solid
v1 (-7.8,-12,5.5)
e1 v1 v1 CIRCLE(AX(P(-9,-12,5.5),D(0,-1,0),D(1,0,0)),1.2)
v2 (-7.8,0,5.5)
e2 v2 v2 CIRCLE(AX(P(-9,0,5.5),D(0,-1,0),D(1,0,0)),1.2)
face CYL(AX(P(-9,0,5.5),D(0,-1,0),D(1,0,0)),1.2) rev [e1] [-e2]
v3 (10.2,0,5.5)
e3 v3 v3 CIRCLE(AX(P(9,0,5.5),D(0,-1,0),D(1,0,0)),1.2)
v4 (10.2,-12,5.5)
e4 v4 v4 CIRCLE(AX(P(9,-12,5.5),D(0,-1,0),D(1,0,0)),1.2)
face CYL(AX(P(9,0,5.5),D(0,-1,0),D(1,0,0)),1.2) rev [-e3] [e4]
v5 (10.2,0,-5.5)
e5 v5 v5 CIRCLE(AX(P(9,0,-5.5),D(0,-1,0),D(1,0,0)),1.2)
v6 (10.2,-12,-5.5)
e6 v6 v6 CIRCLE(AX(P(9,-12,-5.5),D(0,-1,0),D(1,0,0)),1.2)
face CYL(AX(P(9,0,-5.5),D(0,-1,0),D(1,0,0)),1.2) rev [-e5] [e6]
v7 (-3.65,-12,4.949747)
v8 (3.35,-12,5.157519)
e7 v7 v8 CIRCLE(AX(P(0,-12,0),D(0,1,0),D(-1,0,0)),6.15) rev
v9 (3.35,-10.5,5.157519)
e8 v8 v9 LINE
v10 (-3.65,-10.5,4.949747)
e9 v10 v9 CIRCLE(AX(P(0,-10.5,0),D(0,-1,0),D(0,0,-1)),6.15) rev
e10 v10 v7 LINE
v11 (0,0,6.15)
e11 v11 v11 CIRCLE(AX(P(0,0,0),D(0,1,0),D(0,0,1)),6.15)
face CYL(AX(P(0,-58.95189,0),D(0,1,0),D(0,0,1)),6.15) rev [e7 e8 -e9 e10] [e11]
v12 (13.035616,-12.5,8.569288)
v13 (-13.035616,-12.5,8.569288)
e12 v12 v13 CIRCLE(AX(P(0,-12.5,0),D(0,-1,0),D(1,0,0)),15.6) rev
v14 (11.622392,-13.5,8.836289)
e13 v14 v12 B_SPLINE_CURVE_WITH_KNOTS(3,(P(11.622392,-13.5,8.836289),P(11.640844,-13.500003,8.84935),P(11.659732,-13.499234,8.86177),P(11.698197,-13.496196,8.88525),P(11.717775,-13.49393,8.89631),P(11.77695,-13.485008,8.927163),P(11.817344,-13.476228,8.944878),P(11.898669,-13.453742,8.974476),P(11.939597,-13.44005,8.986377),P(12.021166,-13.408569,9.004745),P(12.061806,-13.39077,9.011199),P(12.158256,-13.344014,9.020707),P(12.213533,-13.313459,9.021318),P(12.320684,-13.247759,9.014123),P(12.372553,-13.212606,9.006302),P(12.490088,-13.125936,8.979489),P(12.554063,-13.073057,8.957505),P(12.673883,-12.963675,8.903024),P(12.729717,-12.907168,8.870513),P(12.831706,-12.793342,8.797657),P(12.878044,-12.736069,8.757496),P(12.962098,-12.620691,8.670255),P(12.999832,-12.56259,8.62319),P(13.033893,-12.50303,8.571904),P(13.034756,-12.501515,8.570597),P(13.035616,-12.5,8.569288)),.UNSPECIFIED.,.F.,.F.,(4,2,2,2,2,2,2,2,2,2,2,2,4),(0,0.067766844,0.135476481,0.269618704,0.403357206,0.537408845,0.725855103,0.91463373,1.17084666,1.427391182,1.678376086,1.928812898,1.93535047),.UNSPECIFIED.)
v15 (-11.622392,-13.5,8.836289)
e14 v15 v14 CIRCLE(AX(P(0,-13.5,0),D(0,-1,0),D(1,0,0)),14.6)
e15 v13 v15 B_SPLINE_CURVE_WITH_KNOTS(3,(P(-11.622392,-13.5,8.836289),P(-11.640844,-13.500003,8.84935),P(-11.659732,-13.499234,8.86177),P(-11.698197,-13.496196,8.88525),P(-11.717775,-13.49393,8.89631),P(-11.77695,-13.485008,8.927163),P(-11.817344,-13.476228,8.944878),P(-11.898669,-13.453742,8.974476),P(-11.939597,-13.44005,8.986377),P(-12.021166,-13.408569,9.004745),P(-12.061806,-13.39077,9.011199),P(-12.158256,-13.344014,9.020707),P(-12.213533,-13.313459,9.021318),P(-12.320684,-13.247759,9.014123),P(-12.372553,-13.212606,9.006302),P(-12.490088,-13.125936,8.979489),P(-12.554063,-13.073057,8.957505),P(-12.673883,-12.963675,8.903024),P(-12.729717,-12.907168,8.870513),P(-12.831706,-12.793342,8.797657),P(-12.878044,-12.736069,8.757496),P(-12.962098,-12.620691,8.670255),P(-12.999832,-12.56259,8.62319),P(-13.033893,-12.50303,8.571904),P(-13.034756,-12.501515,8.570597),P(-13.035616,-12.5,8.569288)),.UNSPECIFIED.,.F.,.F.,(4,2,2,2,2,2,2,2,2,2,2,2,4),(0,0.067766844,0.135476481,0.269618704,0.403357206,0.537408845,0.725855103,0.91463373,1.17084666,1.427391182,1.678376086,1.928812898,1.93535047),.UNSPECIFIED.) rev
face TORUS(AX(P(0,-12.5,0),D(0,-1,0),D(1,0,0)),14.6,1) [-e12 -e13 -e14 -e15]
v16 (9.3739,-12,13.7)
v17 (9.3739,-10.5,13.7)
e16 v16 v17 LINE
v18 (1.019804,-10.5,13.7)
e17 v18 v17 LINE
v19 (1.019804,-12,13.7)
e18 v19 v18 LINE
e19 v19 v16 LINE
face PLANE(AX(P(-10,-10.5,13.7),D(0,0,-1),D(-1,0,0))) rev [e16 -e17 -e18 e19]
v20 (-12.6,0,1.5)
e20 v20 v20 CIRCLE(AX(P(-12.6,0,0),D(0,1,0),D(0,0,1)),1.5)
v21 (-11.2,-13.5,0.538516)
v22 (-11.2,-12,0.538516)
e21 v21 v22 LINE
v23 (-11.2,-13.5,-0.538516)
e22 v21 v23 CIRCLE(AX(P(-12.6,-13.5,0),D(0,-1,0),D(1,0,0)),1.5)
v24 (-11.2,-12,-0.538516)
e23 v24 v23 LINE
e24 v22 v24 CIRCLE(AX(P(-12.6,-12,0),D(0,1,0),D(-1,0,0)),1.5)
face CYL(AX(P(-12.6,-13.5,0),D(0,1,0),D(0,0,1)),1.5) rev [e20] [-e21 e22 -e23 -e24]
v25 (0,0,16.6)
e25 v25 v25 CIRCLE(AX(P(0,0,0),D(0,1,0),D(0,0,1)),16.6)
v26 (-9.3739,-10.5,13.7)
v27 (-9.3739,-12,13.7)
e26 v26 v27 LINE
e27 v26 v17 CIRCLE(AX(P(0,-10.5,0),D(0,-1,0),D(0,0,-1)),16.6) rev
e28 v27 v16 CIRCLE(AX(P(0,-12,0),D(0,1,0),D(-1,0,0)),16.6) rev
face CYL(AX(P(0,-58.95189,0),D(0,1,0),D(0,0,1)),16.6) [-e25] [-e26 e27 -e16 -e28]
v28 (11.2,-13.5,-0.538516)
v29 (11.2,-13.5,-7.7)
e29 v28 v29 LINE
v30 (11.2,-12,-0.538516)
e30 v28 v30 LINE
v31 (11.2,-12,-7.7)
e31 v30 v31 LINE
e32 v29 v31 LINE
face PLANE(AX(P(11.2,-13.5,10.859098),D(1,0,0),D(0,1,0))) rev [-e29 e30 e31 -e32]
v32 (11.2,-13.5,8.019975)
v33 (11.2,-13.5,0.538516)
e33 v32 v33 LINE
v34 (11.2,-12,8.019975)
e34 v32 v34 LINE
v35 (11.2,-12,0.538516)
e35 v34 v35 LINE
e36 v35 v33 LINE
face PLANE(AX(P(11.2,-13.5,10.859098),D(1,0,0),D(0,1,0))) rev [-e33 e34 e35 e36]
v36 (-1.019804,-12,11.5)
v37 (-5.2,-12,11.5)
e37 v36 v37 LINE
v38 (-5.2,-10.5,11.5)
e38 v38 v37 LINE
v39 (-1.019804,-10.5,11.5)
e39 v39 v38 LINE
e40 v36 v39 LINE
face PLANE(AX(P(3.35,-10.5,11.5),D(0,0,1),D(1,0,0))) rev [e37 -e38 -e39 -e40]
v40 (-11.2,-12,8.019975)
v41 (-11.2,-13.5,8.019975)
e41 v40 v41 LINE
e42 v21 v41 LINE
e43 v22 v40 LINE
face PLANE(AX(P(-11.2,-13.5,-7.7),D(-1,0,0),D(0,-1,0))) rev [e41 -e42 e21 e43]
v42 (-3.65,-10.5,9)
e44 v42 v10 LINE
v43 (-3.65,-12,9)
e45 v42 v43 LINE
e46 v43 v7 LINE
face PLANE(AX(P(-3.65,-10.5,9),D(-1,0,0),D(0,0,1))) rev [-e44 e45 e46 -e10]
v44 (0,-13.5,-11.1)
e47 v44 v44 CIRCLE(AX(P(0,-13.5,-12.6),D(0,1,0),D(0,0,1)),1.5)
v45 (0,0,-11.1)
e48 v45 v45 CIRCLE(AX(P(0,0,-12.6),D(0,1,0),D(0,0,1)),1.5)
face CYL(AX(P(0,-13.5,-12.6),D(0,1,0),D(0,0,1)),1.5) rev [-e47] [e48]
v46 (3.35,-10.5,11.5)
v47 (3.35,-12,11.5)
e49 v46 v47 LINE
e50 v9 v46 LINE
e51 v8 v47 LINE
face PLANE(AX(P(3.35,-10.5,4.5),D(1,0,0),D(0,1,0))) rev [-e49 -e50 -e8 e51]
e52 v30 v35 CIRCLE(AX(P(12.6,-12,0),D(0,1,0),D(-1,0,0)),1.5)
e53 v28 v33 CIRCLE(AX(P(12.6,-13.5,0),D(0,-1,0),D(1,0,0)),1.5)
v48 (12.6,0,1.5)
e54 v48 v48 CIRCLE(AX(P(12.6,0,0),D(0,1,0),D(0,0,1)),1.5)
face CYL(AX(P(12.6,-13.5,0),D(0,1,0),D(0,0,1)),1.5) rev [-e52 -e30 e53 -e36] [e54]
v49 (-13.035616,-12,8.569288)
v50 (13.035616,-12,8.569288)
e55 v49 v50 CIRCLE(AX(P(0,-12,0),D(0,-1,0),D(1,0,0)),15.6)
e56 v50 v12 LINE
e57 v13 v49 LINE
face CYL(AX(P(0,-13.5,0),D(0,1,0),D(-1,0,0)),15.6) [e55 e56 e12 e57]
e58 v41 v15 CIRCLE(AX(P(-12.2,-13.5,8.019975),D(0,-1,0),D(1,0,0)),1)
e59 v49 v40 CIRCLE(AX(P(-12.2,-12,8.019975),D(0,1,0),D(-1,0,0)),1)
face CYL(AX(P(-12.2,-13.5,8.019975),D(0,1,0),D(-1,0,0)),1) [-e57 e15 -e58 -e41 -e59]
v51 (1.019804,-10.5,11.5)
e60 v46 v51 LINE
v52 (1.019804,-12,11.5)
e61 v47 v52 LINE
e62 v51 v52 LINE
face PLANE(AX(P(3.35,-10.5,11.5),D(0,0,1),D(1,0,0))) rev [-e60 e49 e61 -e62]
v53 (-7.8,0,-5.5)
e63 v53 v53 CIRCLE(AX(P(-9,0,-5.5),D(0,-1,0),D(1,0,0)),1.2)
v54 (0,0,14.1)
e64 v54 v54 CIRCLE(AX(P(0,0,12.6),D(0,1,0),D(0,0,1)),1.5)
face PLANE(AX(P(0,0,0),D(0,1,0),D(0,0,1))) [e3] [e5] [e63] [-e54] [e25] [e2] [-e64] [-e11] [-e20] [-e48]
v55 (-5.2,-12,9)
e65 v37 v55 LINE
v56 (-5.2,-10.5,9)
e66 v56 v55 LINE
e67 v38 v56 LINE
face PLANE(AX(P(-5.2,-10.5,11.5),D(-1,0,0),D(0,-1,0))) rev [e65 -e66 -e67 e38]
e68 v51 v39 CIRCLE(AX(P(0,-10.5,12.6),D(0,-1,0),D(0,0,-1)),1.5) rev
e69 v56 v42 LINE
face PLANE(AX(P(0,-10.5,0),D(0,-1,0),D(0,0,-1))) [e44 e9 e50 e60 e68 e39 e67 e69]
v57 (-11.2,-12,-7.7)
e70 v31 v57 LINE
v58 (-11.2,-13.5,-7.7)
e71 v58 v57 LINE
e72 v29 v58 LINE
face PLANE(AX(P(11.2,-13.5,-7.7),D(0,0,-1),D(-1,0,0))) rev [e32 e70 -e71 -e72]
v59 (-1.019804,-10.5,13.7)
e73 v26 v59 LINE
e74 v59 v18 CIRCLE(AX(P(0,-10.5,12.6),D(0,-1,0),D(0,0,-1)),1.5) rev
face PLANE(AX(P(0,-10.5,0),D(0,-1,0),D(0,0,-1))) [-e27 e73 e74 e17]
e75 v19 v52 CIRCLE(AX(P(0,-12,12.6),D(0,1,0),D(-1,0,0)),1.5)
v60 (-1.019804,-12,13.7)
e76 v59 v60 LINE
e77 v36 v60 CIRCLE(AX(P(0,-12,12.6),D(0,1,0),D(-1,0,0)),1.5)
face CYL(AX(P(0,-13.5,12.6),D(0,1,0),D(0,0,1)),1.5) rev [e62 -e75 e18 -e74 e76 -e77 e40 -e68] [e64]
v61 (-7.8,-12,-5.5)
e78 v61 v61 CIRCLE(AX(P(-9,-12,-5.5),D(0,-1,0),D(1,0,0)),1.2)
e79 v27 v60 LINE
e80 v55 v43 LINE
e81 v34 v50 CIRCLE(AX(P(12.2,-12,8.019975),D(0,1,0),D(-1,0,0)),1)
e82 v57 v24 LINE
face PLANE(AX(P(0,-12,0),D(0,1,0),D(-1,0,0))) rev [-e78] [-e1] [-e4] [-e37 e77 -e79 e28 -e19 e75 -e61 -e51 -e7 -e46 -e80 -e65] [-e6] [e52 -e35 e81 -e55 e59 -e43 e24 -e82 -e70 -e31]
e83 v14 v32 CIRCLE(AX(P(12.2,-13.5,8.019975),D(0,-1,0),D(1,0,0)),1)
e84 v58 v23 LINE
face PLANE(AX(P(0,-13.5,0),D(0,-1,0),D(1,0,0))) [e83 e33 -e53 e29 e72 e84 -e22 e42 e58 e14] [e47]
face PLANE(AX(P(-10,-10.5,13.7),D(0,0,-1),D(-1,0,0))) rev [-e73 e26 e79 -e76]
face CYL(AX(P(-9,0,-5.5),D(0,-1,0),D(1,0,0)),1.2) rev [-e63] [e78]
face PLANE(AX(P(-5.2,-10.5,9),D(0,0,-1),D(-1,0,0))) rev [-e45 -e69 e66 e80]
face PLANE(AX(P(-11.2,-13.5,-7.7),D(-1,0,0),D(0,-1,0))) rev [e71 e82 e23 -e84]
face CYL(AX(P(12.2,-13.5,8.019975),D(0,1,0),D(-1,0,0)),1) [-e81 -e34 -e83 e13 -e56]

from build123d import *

# Parameters (mm, degrees)
SKETCH4_R           = 16.6
SKETCH4_R_2         = 6.15
BOSS_EXTRUDE1_DEPTH = 12
BOSS_EXTRUDE2_DEPTH = 1.5
SKETCH6_R           = 1.2
CUT_EXTRUDE1_DEPTH  = 27.365128484
SKETCH7_R           = 1.5
CUT_EXTRUDE2_DEPTH  = 28.08080501
FILLET1_R           = 1
FILLET2_R           = 1
SKETCH8_W           = 20
SKETCH8_H           = 5
CUT_EXTRUDE3_DEPTH  = 1.5


with BuildPart() as part:
    # Sketch4 → Boss-Extrude1 (new body)
    with BuildSketch(Plane(origin=(0, 0, 0), x_dir=(1, 0, 0), z_dir=(0, 1, 0))):
        with Locations(Location((0, 0, 0), (0, 0, 270))):
            Circle(SKETCH4_R)
        with Locations(Location((0, 0, 0), (0, 0, 270))):
            Circle(SKETCH4_R_2, mode=Mode.SUBTRACT)
    extrude(amount=-BOSS_EXTRUDE1_DEPTH)

    # Sketch5 → Boss-Extrude2 (add)
    with BuildSketch(Plane.XZ.offset(12)):
        with BuildLine():
            Line((11.2, 10.859097568), (11.2, -7.7))
            Line((11.2, -7.7), (-11.2, -7.7))
            Line((-11.2, -7.7), (-11.2, 10.859097568))
            ThreePointArc((-11.2, 10.859097568), (0, -15.6), (11.2, 10.859097568))
        make_face()
    extrude(amount=BOSS_EXTRUDE2_DEPTH)

    # Sketch6 → Cut-Extrude1 (cut, through all)
    with BuildSketch(Plane.XZ.offset(12)):
        with Locations((9, -5.5)):
            Circle(SKETCH6_R)
        with Locations((9, 5.5)):
            Circle(SKETCH6_R)
        with Locations((-9, 5.5)):
            Circle(SKETCH6_R)
        with Locations((-9, -5.5)):
            Circle(SKETCH6_R)
    extrude(amount=-CUT_EXTRUDE1_DEPTH, mode=Mode.SUBTRACT)

    # Sketch7 → Cut-Extrude2 (cut, through all)
    with BuildSketch(Plane(origin=(0, 0, 0), x_dir=(1, 0, 0), z_dir=(0, 1, 0))):
        with Locations(Location((0, 12.6, 0), (0, 0, 270))):
            Circle(SKETCH7_R)
        with Locations(Location((12.6, 0, 0), (0, 0, 270))):
            Circle(SKETCH7_R)
        with Locations(Location((-12.6, 0, 0), (0, 0, 270))):
            Circle(SKETCH7_R)
        with Locations(Location((0, -12.6, 0), (0, 0, 270))):
            Circle(SKETCH7_R)
    extrude(amount=-CUT_EXTRUDE2_DEPTH, mode=Mode.SUBTRACT)

    # Fillet1
    fillet1_edges = [part.edges().sort_by_distance(p)[0] for p in [
        (-11.2, -12.75, 10.859097568),
        (11.2, -12.75, 10.859097568),
    ]]
    fillet(fillet1_edges, radius=FILLET1_R)

    # Fillet2
    # the kernel refuses this fillet: 1 mm, written as the material it takes off along each edge
    with BuildSketch(Plane(origin=(0, -13.5, 0), x_dir=(-0.7369271930502395, 0, 0.675972123791429), z_dir=(0.675972123791429, 0, 0.7369271930502395))) as fillet2_piece_1:
        with BuildLine():
            CenterArc((15.6 - FILLET2_R, -FILLET2_R), FILLET2_R, 0, 90)
            Line((15.6 - FILLET2_R, 0), (15.6, 0))
            Line((15.6, 0), (15.6, -FILLET2_R))
        make_face()
    revolve(axis=Axis((0, -13.5, 0), (0, -1, 0)), revolution_arc=265.059373538, mode=Mode.SUBTRACT)

    # Sketch8 → Cut-Extrude3 (cut)
    with BuildSketch(Plane.XZ.offset(12)):
        with Locations((0, 16.2)):
            Rectangle(SKETCH8_W, SKETCH8_H)
        Polygon((3.35, 11.5), (-5.2, 11.5), (-5.2, 9), (-3.65, 9), (-3.65, 4.5), (3.35, 4.5), align=None)
    extrude(amount=-CUT_EXTRUDE3_DEPTH, mode=Mode.SUBTRACT)


solid = part.part
